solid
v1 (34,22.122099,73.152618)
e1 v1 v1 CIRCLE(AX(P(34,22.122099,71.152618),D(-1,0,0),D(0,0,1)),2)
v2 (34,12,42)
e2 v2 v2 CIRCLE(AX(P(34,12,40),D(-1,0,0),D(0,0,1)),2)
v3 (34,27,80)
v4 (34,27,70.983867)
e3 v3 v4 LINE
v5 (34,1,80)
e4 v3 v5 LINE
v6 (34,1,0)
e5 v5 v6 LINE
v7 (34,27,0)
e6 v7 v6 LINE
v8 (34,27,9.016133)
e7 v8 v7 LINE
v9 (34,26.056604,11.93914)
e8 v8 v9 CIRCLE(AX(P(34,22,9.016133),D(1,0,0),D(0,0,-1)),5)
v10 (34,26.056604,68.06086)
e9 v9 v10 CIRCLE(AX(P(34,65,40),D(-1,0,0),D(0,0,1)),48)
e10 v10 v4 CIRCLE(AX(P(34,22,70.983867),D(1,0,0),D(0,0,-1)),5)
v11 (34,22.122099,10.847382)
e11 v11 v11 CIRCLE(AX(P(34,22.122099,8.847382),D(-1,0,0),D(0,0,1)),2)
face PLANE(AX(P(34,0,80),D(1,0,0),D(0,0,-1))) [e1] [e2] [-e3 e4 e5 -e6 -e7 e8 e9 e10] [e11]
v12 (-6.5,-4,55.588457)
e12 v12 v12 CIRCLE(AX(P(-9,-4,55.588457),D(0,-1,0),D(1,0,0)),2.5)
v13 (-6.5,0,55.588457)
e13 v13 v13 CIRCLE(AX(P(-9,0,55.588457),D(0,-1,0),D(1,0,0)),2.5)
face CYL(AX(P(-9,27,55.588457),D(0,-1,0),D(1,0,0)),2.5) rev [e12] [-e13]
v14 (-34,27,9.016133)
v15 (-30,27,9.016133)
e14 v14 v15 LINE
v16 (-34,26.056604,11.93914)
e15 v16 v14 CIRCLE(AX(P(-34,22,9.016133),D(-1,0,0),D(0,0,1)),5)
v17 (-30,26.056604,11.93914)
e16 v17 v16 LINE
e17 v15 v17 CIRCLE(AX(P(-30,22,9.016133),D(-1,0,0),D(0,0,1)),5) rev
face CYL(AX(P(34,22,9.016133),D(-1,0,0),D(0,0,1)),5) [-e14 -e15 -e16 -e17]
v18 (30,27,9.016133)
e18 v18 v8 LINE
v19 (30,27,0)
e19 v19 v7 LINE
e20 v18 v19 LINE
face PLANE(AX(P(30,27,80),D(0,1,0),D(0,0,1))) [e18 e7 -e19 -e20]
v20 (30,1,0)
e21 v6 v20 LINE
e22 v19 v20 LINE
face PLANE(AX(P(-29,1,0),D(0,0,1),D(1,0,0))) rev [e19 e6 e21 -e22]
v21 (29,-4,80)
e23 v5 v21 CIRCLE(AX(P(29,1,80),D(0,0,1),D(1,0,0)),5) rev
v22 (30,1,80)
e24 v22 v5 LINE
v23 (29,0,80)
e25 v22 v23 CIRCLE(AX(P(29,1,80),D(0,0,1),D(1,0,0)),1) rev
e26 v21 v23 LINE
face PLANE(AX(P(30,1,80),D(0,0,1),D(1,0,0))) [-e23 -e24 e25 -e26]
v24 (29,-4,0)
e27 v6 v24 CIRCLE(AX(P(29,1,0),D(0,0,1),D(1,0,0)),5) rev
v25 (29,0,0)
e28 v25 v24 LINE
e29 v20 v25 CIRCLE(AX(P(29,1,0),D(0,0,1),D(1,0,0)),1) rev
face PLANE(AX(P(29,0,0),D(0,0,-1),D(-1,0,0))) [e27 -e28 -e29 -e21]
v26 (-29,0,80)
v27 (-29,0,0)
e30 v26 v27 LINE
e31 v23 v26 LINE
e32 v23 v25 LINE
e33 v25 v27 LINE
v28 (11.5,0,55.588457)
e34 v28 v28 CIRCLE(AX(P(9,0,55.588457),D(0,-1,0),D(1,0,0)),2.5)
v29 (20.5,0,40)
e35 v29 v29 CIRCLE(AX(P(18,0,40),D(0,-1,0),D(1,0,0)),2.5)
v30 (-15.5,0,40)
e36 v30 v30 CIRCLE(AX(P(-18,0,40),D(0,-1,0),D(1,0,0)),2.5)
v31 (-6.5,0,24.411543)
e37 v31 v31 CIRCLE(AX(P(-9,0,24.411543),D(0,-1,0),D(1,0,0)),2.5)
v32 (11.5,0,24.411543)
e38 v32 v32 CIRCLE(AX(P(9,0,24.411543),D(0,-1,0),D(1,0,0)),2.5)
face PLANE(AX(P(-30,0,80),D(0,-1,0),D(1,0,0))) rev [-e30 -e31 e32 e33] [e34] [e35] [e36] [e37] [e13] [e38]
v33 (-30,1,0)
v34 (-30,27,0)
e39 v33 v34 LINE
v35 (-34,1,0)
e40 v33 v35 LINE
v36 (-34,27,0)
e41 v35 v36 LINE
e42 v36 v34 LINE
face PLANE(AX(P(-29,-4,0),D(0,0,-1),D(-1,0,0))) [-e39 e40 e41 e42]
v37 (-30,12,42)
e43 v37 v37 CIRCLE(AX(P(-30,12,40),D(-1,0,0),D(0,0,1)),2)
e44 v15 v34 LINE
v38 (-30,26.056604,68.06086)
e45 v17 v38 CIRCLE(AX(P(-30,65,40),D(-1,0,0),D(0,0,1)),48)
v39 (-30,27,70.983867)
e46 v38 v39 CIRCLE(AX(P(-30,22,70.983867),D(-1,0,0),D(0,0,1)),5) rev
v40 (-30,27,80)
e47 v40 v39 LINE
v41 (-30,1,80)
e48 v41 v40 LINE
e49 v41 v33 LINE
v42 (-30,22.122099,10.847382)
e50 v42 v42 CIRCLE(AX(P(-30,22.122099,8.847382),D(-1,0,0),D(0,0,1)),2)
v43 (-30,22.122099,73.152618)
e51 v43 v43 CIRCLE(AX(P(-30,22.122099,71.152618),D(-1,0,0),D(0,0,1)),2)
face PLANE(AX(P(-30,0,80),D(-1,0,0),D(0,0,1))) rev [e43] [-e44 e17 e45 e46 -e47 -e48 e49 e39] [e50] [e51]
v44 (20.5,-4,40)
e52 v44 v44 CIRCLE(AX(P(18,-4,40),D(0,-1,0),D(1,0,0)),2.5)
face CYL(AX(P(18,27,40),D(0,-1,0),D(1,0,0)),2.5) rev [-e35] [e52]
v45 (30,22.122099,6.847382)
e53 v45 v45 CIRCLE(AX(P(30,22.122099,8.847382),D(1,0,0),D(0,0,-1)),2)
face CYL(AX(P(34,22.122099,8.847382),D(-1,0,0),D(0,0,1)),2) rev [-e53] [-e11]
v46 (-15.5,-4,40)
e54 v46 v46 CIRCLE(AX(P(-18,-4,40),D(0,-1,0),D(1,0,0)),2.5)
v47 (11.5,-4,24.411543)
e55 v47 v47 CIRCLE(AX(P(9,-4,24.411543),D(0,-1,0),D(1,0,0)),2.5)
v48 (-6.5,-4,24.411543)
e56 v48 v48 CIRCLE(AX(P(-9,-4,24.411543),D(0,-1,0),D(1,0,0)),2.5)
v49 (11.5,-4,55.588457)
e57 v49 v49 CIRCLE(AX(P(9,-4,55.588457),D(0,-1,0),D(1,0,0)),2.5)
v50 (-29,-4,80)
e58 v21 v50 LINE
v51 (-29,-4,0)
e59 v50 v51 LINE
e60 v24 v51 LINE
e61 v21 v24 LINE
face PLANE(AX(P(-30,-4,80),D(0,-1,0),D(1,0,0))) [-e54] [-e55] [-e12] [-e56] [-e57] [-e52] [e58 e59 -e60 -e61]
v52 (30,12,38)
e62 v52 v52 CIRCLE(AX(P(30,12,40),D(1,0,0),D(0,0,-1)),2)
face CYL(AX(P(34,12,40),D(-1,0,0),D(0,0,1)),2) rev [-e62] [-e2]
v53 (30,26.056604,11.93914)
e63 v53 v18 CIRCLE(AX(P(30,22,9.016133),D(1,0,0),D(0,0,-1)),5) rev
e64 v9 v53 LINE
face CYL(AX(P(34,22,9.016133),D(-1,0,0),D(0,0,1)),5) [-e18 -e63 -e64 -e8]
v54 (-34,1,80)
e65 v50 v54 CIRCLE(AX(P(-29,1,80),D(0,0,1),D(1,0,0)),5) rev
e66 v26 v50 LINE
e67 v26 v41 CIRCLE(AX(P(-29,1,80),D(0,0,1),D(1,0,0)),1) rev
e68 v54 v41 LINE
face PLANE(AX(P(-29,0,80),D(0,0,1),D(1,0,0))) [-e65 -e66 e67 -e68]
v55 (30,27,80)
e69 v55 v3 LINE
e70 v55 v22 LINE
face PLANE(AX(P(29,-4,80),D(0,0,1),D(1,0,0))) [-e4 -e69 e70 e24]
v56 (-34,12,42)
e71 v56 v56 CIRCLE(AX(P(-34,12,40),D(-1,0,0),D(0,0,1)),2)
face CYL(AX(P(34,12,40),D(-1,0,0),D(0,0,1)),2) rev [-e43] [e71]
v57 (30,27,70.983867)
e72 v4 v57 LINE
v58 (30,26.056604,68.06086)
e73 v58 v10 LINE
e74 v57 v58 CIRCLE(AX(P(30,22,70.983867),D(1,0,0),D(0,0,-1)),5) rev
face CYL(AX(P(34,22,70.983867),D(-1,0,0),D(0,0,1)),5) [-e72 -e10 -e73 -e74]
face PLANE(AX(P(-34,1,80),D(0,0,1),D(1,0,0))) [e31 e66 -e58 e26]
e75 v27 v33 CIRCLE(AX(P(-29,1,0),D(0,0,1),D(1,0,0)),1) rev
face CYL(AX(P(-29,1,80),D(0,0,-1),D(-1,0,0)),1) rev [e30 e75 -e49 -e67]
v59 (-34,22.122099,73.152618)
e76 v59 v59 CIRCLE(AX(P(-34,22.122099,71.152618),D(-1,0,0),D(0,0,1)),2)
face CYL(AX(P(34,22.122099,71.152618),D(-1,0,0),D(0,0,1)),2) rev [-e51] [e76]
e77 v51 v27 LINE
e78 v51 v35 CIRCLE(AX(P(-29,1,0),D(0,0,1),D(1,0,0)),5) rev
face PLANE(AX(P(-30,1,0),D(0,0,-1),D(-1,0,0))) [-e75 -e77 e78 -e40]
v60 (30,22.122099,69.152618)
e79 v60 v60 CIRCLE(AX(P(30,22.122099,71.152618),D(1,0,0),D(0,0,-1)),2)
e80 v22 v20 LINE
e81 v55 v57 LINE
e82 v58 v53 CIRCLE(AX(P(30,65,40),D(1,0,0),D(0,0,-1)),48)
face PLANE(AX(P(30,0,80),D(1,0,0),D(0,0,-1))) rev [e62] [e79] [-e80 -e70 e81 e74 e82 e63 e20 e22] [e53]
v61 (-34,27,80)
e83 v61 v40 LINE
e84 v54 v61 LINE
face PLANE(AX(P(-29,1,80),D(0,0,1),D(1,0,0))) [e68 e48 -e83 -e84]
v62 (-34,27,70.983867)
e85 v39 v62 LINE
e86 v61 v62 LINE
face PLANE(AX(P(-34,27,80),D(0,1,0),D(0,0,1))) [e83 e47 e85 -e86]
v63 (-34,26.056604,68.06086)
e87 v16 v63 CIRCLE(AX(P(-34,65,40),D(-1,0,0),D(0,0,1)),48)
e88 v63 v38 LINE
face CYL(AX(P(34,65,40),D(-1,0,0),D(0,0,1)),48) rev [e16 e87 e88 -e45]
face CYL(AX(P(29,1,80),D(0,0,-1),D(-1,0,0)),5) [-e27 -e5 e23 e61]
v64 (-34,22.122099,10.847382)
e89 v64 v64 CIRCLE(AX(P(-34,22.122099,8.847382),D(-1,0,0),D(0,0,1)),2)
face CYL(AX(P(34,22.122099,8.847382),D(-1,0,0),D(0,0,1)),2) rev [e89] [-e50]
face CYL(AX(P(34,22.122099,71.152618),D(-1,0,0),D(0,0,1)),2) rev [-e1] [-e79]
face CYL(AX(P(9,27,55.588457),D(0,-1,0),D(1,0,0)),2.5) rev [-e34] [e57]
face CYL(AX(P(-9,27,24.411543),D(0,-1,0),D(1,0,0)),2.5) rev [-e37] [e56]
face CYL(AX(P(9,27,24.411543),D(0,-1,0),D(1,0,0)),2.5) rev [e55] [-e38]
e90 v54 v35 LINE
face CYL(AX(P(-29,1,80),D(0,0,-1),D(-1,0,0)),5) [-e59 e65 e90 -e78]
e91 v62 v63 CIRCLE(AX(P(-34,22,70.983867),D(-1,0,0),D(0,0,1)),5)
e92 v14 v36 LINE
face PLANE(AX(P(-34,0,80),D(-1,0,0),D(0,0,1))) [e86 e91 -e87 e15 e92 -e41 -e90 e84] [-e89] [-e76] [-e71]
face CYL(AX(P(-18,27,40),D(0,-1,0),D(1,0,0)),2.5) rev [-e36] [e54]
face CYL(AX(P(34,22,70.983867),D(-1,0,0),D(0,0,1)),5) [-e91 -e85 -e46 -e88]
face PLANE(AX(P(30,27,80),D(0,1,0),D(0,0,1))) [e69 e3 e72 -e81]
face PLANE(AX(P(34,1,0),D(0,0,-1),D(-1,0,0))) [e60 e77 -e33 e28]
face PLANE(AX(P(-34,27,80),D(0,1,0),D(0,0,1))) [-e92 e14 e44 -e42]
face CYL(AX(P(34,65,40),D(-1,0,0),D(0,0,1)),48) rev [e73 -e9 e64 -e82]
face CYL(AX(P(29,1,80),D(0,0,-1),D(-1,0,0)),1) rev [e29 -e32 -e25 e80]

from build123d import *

# Parameters (mm, degrees)
SM_BASE_FLANGE_1_DEPTH   = 80
CUT_EXTRUDE_3_DEPTH      = 109.411254028
CUT_EXTRUDE_3_DEPTH_BACK = 109.411254028
SKETCH_6_R               = 48
SKETCH_6_R_2             = 2
FILLET_1_R               = 5
SKETCH_9_R               = 2.5
CUT_EXTRUDE_4_DEPTH      = 93.287593966


# Sheet-metal steps are written as plain solids
with BuildPart() as part:
    # Sketch 1 → Базовая кромка1 (new body)
    with BuildSketch(Plane.XY):
        with BuildLine():
            Line((-30, 27), (-30, 1))
            ThreePointArc((-30, 1), (-29.707106781, 0.292893219), (-29, 0))
            Line((-29, 0), (29, 0))
            ThreePointArc((29, 0), (29.707106781, 0.292893219), (30, 1))
            Line((30, 1), (30, 27))
            Line((30, 27), (34, 27))
            Line((34, 27), (34, 1))
            ThreePointArc((34, 1), (32.535533906, -2.535533906), (29, -4))
            Line((29, -4), (-29, -4))
            ThreePointArc((-29, -4), (-32.535533906, -2.535533906), (-34, 1))
            Line((-34, 1), (-34, 27))
            Line((-34, 27), (-30, 27))
        make_face()
    extrude(amount=SM_BASE_FLANGE_1_DEPTH)

    # Эскиз6 → Вырез-Вытянуть3 (cut, two sides: drawn at the far end of the back side and taken through both)
    with BuildSketch(Plane.ZY.offset(34).offset(-CUT_EXTRUDE_3_DEPTH_BACK)):
        with Locations((40, 65)):
            Circle(SKETCH_6_R)
        with Locations((40, 12)):
            Circle(SKETCH_6_R_2)
        with Locations((8.847381628, 22.122099298)):
            Circle(SKETCH_6_R_2)
        with Locations((71.152618372, 22.122099298)):
            Circle(SKETCH_6_R_2)
    extrude(amount=CUT_EXTRUDE_3_DEPTH + CUT_EXTRUDE_3_DEPTH_BACK, mode=Mode.SUBTRACT)

    # Скругление1
    fillet_1_edges = [part.edges().sort_by_distance(p)[0] for p in [
        (32, 27, 10.674243403),
        (32, 27, 69.325756597),
        (-32, 27, 10.674243403),
        (-32, 27, 69.325756597),
    ]]
    fillet(fillet_1_edges, radius=FILLET_1_R)

    # Эскиз9 → Вырез-Вытянуть4 (cut, through all)
    with BuildSketch(Plane.XZ.offset(4)):
        with Locations((-18, 40)):
            Circle(SKETCH_9_R)
        with Locations((-9, 55.588457268)):
            Circle(SKETCH_9_R)
        with Locations((9, 55.588457268)):
            Circle(SKETCH_9_R)
        with Locations((18, 40)):
            Circle(SKETCH_9_R)
        with Locations((9, 24.411542732)):
            Circle(SKETCH_9_R)
        with Locations((-9, 24.411542732)):
            Circle(SKETCH_9_R)
    extrude(amount=-CUT_EXTRUDE_4_DEPTH, mode=Mode.SUBTRACT)


solid = part.part
